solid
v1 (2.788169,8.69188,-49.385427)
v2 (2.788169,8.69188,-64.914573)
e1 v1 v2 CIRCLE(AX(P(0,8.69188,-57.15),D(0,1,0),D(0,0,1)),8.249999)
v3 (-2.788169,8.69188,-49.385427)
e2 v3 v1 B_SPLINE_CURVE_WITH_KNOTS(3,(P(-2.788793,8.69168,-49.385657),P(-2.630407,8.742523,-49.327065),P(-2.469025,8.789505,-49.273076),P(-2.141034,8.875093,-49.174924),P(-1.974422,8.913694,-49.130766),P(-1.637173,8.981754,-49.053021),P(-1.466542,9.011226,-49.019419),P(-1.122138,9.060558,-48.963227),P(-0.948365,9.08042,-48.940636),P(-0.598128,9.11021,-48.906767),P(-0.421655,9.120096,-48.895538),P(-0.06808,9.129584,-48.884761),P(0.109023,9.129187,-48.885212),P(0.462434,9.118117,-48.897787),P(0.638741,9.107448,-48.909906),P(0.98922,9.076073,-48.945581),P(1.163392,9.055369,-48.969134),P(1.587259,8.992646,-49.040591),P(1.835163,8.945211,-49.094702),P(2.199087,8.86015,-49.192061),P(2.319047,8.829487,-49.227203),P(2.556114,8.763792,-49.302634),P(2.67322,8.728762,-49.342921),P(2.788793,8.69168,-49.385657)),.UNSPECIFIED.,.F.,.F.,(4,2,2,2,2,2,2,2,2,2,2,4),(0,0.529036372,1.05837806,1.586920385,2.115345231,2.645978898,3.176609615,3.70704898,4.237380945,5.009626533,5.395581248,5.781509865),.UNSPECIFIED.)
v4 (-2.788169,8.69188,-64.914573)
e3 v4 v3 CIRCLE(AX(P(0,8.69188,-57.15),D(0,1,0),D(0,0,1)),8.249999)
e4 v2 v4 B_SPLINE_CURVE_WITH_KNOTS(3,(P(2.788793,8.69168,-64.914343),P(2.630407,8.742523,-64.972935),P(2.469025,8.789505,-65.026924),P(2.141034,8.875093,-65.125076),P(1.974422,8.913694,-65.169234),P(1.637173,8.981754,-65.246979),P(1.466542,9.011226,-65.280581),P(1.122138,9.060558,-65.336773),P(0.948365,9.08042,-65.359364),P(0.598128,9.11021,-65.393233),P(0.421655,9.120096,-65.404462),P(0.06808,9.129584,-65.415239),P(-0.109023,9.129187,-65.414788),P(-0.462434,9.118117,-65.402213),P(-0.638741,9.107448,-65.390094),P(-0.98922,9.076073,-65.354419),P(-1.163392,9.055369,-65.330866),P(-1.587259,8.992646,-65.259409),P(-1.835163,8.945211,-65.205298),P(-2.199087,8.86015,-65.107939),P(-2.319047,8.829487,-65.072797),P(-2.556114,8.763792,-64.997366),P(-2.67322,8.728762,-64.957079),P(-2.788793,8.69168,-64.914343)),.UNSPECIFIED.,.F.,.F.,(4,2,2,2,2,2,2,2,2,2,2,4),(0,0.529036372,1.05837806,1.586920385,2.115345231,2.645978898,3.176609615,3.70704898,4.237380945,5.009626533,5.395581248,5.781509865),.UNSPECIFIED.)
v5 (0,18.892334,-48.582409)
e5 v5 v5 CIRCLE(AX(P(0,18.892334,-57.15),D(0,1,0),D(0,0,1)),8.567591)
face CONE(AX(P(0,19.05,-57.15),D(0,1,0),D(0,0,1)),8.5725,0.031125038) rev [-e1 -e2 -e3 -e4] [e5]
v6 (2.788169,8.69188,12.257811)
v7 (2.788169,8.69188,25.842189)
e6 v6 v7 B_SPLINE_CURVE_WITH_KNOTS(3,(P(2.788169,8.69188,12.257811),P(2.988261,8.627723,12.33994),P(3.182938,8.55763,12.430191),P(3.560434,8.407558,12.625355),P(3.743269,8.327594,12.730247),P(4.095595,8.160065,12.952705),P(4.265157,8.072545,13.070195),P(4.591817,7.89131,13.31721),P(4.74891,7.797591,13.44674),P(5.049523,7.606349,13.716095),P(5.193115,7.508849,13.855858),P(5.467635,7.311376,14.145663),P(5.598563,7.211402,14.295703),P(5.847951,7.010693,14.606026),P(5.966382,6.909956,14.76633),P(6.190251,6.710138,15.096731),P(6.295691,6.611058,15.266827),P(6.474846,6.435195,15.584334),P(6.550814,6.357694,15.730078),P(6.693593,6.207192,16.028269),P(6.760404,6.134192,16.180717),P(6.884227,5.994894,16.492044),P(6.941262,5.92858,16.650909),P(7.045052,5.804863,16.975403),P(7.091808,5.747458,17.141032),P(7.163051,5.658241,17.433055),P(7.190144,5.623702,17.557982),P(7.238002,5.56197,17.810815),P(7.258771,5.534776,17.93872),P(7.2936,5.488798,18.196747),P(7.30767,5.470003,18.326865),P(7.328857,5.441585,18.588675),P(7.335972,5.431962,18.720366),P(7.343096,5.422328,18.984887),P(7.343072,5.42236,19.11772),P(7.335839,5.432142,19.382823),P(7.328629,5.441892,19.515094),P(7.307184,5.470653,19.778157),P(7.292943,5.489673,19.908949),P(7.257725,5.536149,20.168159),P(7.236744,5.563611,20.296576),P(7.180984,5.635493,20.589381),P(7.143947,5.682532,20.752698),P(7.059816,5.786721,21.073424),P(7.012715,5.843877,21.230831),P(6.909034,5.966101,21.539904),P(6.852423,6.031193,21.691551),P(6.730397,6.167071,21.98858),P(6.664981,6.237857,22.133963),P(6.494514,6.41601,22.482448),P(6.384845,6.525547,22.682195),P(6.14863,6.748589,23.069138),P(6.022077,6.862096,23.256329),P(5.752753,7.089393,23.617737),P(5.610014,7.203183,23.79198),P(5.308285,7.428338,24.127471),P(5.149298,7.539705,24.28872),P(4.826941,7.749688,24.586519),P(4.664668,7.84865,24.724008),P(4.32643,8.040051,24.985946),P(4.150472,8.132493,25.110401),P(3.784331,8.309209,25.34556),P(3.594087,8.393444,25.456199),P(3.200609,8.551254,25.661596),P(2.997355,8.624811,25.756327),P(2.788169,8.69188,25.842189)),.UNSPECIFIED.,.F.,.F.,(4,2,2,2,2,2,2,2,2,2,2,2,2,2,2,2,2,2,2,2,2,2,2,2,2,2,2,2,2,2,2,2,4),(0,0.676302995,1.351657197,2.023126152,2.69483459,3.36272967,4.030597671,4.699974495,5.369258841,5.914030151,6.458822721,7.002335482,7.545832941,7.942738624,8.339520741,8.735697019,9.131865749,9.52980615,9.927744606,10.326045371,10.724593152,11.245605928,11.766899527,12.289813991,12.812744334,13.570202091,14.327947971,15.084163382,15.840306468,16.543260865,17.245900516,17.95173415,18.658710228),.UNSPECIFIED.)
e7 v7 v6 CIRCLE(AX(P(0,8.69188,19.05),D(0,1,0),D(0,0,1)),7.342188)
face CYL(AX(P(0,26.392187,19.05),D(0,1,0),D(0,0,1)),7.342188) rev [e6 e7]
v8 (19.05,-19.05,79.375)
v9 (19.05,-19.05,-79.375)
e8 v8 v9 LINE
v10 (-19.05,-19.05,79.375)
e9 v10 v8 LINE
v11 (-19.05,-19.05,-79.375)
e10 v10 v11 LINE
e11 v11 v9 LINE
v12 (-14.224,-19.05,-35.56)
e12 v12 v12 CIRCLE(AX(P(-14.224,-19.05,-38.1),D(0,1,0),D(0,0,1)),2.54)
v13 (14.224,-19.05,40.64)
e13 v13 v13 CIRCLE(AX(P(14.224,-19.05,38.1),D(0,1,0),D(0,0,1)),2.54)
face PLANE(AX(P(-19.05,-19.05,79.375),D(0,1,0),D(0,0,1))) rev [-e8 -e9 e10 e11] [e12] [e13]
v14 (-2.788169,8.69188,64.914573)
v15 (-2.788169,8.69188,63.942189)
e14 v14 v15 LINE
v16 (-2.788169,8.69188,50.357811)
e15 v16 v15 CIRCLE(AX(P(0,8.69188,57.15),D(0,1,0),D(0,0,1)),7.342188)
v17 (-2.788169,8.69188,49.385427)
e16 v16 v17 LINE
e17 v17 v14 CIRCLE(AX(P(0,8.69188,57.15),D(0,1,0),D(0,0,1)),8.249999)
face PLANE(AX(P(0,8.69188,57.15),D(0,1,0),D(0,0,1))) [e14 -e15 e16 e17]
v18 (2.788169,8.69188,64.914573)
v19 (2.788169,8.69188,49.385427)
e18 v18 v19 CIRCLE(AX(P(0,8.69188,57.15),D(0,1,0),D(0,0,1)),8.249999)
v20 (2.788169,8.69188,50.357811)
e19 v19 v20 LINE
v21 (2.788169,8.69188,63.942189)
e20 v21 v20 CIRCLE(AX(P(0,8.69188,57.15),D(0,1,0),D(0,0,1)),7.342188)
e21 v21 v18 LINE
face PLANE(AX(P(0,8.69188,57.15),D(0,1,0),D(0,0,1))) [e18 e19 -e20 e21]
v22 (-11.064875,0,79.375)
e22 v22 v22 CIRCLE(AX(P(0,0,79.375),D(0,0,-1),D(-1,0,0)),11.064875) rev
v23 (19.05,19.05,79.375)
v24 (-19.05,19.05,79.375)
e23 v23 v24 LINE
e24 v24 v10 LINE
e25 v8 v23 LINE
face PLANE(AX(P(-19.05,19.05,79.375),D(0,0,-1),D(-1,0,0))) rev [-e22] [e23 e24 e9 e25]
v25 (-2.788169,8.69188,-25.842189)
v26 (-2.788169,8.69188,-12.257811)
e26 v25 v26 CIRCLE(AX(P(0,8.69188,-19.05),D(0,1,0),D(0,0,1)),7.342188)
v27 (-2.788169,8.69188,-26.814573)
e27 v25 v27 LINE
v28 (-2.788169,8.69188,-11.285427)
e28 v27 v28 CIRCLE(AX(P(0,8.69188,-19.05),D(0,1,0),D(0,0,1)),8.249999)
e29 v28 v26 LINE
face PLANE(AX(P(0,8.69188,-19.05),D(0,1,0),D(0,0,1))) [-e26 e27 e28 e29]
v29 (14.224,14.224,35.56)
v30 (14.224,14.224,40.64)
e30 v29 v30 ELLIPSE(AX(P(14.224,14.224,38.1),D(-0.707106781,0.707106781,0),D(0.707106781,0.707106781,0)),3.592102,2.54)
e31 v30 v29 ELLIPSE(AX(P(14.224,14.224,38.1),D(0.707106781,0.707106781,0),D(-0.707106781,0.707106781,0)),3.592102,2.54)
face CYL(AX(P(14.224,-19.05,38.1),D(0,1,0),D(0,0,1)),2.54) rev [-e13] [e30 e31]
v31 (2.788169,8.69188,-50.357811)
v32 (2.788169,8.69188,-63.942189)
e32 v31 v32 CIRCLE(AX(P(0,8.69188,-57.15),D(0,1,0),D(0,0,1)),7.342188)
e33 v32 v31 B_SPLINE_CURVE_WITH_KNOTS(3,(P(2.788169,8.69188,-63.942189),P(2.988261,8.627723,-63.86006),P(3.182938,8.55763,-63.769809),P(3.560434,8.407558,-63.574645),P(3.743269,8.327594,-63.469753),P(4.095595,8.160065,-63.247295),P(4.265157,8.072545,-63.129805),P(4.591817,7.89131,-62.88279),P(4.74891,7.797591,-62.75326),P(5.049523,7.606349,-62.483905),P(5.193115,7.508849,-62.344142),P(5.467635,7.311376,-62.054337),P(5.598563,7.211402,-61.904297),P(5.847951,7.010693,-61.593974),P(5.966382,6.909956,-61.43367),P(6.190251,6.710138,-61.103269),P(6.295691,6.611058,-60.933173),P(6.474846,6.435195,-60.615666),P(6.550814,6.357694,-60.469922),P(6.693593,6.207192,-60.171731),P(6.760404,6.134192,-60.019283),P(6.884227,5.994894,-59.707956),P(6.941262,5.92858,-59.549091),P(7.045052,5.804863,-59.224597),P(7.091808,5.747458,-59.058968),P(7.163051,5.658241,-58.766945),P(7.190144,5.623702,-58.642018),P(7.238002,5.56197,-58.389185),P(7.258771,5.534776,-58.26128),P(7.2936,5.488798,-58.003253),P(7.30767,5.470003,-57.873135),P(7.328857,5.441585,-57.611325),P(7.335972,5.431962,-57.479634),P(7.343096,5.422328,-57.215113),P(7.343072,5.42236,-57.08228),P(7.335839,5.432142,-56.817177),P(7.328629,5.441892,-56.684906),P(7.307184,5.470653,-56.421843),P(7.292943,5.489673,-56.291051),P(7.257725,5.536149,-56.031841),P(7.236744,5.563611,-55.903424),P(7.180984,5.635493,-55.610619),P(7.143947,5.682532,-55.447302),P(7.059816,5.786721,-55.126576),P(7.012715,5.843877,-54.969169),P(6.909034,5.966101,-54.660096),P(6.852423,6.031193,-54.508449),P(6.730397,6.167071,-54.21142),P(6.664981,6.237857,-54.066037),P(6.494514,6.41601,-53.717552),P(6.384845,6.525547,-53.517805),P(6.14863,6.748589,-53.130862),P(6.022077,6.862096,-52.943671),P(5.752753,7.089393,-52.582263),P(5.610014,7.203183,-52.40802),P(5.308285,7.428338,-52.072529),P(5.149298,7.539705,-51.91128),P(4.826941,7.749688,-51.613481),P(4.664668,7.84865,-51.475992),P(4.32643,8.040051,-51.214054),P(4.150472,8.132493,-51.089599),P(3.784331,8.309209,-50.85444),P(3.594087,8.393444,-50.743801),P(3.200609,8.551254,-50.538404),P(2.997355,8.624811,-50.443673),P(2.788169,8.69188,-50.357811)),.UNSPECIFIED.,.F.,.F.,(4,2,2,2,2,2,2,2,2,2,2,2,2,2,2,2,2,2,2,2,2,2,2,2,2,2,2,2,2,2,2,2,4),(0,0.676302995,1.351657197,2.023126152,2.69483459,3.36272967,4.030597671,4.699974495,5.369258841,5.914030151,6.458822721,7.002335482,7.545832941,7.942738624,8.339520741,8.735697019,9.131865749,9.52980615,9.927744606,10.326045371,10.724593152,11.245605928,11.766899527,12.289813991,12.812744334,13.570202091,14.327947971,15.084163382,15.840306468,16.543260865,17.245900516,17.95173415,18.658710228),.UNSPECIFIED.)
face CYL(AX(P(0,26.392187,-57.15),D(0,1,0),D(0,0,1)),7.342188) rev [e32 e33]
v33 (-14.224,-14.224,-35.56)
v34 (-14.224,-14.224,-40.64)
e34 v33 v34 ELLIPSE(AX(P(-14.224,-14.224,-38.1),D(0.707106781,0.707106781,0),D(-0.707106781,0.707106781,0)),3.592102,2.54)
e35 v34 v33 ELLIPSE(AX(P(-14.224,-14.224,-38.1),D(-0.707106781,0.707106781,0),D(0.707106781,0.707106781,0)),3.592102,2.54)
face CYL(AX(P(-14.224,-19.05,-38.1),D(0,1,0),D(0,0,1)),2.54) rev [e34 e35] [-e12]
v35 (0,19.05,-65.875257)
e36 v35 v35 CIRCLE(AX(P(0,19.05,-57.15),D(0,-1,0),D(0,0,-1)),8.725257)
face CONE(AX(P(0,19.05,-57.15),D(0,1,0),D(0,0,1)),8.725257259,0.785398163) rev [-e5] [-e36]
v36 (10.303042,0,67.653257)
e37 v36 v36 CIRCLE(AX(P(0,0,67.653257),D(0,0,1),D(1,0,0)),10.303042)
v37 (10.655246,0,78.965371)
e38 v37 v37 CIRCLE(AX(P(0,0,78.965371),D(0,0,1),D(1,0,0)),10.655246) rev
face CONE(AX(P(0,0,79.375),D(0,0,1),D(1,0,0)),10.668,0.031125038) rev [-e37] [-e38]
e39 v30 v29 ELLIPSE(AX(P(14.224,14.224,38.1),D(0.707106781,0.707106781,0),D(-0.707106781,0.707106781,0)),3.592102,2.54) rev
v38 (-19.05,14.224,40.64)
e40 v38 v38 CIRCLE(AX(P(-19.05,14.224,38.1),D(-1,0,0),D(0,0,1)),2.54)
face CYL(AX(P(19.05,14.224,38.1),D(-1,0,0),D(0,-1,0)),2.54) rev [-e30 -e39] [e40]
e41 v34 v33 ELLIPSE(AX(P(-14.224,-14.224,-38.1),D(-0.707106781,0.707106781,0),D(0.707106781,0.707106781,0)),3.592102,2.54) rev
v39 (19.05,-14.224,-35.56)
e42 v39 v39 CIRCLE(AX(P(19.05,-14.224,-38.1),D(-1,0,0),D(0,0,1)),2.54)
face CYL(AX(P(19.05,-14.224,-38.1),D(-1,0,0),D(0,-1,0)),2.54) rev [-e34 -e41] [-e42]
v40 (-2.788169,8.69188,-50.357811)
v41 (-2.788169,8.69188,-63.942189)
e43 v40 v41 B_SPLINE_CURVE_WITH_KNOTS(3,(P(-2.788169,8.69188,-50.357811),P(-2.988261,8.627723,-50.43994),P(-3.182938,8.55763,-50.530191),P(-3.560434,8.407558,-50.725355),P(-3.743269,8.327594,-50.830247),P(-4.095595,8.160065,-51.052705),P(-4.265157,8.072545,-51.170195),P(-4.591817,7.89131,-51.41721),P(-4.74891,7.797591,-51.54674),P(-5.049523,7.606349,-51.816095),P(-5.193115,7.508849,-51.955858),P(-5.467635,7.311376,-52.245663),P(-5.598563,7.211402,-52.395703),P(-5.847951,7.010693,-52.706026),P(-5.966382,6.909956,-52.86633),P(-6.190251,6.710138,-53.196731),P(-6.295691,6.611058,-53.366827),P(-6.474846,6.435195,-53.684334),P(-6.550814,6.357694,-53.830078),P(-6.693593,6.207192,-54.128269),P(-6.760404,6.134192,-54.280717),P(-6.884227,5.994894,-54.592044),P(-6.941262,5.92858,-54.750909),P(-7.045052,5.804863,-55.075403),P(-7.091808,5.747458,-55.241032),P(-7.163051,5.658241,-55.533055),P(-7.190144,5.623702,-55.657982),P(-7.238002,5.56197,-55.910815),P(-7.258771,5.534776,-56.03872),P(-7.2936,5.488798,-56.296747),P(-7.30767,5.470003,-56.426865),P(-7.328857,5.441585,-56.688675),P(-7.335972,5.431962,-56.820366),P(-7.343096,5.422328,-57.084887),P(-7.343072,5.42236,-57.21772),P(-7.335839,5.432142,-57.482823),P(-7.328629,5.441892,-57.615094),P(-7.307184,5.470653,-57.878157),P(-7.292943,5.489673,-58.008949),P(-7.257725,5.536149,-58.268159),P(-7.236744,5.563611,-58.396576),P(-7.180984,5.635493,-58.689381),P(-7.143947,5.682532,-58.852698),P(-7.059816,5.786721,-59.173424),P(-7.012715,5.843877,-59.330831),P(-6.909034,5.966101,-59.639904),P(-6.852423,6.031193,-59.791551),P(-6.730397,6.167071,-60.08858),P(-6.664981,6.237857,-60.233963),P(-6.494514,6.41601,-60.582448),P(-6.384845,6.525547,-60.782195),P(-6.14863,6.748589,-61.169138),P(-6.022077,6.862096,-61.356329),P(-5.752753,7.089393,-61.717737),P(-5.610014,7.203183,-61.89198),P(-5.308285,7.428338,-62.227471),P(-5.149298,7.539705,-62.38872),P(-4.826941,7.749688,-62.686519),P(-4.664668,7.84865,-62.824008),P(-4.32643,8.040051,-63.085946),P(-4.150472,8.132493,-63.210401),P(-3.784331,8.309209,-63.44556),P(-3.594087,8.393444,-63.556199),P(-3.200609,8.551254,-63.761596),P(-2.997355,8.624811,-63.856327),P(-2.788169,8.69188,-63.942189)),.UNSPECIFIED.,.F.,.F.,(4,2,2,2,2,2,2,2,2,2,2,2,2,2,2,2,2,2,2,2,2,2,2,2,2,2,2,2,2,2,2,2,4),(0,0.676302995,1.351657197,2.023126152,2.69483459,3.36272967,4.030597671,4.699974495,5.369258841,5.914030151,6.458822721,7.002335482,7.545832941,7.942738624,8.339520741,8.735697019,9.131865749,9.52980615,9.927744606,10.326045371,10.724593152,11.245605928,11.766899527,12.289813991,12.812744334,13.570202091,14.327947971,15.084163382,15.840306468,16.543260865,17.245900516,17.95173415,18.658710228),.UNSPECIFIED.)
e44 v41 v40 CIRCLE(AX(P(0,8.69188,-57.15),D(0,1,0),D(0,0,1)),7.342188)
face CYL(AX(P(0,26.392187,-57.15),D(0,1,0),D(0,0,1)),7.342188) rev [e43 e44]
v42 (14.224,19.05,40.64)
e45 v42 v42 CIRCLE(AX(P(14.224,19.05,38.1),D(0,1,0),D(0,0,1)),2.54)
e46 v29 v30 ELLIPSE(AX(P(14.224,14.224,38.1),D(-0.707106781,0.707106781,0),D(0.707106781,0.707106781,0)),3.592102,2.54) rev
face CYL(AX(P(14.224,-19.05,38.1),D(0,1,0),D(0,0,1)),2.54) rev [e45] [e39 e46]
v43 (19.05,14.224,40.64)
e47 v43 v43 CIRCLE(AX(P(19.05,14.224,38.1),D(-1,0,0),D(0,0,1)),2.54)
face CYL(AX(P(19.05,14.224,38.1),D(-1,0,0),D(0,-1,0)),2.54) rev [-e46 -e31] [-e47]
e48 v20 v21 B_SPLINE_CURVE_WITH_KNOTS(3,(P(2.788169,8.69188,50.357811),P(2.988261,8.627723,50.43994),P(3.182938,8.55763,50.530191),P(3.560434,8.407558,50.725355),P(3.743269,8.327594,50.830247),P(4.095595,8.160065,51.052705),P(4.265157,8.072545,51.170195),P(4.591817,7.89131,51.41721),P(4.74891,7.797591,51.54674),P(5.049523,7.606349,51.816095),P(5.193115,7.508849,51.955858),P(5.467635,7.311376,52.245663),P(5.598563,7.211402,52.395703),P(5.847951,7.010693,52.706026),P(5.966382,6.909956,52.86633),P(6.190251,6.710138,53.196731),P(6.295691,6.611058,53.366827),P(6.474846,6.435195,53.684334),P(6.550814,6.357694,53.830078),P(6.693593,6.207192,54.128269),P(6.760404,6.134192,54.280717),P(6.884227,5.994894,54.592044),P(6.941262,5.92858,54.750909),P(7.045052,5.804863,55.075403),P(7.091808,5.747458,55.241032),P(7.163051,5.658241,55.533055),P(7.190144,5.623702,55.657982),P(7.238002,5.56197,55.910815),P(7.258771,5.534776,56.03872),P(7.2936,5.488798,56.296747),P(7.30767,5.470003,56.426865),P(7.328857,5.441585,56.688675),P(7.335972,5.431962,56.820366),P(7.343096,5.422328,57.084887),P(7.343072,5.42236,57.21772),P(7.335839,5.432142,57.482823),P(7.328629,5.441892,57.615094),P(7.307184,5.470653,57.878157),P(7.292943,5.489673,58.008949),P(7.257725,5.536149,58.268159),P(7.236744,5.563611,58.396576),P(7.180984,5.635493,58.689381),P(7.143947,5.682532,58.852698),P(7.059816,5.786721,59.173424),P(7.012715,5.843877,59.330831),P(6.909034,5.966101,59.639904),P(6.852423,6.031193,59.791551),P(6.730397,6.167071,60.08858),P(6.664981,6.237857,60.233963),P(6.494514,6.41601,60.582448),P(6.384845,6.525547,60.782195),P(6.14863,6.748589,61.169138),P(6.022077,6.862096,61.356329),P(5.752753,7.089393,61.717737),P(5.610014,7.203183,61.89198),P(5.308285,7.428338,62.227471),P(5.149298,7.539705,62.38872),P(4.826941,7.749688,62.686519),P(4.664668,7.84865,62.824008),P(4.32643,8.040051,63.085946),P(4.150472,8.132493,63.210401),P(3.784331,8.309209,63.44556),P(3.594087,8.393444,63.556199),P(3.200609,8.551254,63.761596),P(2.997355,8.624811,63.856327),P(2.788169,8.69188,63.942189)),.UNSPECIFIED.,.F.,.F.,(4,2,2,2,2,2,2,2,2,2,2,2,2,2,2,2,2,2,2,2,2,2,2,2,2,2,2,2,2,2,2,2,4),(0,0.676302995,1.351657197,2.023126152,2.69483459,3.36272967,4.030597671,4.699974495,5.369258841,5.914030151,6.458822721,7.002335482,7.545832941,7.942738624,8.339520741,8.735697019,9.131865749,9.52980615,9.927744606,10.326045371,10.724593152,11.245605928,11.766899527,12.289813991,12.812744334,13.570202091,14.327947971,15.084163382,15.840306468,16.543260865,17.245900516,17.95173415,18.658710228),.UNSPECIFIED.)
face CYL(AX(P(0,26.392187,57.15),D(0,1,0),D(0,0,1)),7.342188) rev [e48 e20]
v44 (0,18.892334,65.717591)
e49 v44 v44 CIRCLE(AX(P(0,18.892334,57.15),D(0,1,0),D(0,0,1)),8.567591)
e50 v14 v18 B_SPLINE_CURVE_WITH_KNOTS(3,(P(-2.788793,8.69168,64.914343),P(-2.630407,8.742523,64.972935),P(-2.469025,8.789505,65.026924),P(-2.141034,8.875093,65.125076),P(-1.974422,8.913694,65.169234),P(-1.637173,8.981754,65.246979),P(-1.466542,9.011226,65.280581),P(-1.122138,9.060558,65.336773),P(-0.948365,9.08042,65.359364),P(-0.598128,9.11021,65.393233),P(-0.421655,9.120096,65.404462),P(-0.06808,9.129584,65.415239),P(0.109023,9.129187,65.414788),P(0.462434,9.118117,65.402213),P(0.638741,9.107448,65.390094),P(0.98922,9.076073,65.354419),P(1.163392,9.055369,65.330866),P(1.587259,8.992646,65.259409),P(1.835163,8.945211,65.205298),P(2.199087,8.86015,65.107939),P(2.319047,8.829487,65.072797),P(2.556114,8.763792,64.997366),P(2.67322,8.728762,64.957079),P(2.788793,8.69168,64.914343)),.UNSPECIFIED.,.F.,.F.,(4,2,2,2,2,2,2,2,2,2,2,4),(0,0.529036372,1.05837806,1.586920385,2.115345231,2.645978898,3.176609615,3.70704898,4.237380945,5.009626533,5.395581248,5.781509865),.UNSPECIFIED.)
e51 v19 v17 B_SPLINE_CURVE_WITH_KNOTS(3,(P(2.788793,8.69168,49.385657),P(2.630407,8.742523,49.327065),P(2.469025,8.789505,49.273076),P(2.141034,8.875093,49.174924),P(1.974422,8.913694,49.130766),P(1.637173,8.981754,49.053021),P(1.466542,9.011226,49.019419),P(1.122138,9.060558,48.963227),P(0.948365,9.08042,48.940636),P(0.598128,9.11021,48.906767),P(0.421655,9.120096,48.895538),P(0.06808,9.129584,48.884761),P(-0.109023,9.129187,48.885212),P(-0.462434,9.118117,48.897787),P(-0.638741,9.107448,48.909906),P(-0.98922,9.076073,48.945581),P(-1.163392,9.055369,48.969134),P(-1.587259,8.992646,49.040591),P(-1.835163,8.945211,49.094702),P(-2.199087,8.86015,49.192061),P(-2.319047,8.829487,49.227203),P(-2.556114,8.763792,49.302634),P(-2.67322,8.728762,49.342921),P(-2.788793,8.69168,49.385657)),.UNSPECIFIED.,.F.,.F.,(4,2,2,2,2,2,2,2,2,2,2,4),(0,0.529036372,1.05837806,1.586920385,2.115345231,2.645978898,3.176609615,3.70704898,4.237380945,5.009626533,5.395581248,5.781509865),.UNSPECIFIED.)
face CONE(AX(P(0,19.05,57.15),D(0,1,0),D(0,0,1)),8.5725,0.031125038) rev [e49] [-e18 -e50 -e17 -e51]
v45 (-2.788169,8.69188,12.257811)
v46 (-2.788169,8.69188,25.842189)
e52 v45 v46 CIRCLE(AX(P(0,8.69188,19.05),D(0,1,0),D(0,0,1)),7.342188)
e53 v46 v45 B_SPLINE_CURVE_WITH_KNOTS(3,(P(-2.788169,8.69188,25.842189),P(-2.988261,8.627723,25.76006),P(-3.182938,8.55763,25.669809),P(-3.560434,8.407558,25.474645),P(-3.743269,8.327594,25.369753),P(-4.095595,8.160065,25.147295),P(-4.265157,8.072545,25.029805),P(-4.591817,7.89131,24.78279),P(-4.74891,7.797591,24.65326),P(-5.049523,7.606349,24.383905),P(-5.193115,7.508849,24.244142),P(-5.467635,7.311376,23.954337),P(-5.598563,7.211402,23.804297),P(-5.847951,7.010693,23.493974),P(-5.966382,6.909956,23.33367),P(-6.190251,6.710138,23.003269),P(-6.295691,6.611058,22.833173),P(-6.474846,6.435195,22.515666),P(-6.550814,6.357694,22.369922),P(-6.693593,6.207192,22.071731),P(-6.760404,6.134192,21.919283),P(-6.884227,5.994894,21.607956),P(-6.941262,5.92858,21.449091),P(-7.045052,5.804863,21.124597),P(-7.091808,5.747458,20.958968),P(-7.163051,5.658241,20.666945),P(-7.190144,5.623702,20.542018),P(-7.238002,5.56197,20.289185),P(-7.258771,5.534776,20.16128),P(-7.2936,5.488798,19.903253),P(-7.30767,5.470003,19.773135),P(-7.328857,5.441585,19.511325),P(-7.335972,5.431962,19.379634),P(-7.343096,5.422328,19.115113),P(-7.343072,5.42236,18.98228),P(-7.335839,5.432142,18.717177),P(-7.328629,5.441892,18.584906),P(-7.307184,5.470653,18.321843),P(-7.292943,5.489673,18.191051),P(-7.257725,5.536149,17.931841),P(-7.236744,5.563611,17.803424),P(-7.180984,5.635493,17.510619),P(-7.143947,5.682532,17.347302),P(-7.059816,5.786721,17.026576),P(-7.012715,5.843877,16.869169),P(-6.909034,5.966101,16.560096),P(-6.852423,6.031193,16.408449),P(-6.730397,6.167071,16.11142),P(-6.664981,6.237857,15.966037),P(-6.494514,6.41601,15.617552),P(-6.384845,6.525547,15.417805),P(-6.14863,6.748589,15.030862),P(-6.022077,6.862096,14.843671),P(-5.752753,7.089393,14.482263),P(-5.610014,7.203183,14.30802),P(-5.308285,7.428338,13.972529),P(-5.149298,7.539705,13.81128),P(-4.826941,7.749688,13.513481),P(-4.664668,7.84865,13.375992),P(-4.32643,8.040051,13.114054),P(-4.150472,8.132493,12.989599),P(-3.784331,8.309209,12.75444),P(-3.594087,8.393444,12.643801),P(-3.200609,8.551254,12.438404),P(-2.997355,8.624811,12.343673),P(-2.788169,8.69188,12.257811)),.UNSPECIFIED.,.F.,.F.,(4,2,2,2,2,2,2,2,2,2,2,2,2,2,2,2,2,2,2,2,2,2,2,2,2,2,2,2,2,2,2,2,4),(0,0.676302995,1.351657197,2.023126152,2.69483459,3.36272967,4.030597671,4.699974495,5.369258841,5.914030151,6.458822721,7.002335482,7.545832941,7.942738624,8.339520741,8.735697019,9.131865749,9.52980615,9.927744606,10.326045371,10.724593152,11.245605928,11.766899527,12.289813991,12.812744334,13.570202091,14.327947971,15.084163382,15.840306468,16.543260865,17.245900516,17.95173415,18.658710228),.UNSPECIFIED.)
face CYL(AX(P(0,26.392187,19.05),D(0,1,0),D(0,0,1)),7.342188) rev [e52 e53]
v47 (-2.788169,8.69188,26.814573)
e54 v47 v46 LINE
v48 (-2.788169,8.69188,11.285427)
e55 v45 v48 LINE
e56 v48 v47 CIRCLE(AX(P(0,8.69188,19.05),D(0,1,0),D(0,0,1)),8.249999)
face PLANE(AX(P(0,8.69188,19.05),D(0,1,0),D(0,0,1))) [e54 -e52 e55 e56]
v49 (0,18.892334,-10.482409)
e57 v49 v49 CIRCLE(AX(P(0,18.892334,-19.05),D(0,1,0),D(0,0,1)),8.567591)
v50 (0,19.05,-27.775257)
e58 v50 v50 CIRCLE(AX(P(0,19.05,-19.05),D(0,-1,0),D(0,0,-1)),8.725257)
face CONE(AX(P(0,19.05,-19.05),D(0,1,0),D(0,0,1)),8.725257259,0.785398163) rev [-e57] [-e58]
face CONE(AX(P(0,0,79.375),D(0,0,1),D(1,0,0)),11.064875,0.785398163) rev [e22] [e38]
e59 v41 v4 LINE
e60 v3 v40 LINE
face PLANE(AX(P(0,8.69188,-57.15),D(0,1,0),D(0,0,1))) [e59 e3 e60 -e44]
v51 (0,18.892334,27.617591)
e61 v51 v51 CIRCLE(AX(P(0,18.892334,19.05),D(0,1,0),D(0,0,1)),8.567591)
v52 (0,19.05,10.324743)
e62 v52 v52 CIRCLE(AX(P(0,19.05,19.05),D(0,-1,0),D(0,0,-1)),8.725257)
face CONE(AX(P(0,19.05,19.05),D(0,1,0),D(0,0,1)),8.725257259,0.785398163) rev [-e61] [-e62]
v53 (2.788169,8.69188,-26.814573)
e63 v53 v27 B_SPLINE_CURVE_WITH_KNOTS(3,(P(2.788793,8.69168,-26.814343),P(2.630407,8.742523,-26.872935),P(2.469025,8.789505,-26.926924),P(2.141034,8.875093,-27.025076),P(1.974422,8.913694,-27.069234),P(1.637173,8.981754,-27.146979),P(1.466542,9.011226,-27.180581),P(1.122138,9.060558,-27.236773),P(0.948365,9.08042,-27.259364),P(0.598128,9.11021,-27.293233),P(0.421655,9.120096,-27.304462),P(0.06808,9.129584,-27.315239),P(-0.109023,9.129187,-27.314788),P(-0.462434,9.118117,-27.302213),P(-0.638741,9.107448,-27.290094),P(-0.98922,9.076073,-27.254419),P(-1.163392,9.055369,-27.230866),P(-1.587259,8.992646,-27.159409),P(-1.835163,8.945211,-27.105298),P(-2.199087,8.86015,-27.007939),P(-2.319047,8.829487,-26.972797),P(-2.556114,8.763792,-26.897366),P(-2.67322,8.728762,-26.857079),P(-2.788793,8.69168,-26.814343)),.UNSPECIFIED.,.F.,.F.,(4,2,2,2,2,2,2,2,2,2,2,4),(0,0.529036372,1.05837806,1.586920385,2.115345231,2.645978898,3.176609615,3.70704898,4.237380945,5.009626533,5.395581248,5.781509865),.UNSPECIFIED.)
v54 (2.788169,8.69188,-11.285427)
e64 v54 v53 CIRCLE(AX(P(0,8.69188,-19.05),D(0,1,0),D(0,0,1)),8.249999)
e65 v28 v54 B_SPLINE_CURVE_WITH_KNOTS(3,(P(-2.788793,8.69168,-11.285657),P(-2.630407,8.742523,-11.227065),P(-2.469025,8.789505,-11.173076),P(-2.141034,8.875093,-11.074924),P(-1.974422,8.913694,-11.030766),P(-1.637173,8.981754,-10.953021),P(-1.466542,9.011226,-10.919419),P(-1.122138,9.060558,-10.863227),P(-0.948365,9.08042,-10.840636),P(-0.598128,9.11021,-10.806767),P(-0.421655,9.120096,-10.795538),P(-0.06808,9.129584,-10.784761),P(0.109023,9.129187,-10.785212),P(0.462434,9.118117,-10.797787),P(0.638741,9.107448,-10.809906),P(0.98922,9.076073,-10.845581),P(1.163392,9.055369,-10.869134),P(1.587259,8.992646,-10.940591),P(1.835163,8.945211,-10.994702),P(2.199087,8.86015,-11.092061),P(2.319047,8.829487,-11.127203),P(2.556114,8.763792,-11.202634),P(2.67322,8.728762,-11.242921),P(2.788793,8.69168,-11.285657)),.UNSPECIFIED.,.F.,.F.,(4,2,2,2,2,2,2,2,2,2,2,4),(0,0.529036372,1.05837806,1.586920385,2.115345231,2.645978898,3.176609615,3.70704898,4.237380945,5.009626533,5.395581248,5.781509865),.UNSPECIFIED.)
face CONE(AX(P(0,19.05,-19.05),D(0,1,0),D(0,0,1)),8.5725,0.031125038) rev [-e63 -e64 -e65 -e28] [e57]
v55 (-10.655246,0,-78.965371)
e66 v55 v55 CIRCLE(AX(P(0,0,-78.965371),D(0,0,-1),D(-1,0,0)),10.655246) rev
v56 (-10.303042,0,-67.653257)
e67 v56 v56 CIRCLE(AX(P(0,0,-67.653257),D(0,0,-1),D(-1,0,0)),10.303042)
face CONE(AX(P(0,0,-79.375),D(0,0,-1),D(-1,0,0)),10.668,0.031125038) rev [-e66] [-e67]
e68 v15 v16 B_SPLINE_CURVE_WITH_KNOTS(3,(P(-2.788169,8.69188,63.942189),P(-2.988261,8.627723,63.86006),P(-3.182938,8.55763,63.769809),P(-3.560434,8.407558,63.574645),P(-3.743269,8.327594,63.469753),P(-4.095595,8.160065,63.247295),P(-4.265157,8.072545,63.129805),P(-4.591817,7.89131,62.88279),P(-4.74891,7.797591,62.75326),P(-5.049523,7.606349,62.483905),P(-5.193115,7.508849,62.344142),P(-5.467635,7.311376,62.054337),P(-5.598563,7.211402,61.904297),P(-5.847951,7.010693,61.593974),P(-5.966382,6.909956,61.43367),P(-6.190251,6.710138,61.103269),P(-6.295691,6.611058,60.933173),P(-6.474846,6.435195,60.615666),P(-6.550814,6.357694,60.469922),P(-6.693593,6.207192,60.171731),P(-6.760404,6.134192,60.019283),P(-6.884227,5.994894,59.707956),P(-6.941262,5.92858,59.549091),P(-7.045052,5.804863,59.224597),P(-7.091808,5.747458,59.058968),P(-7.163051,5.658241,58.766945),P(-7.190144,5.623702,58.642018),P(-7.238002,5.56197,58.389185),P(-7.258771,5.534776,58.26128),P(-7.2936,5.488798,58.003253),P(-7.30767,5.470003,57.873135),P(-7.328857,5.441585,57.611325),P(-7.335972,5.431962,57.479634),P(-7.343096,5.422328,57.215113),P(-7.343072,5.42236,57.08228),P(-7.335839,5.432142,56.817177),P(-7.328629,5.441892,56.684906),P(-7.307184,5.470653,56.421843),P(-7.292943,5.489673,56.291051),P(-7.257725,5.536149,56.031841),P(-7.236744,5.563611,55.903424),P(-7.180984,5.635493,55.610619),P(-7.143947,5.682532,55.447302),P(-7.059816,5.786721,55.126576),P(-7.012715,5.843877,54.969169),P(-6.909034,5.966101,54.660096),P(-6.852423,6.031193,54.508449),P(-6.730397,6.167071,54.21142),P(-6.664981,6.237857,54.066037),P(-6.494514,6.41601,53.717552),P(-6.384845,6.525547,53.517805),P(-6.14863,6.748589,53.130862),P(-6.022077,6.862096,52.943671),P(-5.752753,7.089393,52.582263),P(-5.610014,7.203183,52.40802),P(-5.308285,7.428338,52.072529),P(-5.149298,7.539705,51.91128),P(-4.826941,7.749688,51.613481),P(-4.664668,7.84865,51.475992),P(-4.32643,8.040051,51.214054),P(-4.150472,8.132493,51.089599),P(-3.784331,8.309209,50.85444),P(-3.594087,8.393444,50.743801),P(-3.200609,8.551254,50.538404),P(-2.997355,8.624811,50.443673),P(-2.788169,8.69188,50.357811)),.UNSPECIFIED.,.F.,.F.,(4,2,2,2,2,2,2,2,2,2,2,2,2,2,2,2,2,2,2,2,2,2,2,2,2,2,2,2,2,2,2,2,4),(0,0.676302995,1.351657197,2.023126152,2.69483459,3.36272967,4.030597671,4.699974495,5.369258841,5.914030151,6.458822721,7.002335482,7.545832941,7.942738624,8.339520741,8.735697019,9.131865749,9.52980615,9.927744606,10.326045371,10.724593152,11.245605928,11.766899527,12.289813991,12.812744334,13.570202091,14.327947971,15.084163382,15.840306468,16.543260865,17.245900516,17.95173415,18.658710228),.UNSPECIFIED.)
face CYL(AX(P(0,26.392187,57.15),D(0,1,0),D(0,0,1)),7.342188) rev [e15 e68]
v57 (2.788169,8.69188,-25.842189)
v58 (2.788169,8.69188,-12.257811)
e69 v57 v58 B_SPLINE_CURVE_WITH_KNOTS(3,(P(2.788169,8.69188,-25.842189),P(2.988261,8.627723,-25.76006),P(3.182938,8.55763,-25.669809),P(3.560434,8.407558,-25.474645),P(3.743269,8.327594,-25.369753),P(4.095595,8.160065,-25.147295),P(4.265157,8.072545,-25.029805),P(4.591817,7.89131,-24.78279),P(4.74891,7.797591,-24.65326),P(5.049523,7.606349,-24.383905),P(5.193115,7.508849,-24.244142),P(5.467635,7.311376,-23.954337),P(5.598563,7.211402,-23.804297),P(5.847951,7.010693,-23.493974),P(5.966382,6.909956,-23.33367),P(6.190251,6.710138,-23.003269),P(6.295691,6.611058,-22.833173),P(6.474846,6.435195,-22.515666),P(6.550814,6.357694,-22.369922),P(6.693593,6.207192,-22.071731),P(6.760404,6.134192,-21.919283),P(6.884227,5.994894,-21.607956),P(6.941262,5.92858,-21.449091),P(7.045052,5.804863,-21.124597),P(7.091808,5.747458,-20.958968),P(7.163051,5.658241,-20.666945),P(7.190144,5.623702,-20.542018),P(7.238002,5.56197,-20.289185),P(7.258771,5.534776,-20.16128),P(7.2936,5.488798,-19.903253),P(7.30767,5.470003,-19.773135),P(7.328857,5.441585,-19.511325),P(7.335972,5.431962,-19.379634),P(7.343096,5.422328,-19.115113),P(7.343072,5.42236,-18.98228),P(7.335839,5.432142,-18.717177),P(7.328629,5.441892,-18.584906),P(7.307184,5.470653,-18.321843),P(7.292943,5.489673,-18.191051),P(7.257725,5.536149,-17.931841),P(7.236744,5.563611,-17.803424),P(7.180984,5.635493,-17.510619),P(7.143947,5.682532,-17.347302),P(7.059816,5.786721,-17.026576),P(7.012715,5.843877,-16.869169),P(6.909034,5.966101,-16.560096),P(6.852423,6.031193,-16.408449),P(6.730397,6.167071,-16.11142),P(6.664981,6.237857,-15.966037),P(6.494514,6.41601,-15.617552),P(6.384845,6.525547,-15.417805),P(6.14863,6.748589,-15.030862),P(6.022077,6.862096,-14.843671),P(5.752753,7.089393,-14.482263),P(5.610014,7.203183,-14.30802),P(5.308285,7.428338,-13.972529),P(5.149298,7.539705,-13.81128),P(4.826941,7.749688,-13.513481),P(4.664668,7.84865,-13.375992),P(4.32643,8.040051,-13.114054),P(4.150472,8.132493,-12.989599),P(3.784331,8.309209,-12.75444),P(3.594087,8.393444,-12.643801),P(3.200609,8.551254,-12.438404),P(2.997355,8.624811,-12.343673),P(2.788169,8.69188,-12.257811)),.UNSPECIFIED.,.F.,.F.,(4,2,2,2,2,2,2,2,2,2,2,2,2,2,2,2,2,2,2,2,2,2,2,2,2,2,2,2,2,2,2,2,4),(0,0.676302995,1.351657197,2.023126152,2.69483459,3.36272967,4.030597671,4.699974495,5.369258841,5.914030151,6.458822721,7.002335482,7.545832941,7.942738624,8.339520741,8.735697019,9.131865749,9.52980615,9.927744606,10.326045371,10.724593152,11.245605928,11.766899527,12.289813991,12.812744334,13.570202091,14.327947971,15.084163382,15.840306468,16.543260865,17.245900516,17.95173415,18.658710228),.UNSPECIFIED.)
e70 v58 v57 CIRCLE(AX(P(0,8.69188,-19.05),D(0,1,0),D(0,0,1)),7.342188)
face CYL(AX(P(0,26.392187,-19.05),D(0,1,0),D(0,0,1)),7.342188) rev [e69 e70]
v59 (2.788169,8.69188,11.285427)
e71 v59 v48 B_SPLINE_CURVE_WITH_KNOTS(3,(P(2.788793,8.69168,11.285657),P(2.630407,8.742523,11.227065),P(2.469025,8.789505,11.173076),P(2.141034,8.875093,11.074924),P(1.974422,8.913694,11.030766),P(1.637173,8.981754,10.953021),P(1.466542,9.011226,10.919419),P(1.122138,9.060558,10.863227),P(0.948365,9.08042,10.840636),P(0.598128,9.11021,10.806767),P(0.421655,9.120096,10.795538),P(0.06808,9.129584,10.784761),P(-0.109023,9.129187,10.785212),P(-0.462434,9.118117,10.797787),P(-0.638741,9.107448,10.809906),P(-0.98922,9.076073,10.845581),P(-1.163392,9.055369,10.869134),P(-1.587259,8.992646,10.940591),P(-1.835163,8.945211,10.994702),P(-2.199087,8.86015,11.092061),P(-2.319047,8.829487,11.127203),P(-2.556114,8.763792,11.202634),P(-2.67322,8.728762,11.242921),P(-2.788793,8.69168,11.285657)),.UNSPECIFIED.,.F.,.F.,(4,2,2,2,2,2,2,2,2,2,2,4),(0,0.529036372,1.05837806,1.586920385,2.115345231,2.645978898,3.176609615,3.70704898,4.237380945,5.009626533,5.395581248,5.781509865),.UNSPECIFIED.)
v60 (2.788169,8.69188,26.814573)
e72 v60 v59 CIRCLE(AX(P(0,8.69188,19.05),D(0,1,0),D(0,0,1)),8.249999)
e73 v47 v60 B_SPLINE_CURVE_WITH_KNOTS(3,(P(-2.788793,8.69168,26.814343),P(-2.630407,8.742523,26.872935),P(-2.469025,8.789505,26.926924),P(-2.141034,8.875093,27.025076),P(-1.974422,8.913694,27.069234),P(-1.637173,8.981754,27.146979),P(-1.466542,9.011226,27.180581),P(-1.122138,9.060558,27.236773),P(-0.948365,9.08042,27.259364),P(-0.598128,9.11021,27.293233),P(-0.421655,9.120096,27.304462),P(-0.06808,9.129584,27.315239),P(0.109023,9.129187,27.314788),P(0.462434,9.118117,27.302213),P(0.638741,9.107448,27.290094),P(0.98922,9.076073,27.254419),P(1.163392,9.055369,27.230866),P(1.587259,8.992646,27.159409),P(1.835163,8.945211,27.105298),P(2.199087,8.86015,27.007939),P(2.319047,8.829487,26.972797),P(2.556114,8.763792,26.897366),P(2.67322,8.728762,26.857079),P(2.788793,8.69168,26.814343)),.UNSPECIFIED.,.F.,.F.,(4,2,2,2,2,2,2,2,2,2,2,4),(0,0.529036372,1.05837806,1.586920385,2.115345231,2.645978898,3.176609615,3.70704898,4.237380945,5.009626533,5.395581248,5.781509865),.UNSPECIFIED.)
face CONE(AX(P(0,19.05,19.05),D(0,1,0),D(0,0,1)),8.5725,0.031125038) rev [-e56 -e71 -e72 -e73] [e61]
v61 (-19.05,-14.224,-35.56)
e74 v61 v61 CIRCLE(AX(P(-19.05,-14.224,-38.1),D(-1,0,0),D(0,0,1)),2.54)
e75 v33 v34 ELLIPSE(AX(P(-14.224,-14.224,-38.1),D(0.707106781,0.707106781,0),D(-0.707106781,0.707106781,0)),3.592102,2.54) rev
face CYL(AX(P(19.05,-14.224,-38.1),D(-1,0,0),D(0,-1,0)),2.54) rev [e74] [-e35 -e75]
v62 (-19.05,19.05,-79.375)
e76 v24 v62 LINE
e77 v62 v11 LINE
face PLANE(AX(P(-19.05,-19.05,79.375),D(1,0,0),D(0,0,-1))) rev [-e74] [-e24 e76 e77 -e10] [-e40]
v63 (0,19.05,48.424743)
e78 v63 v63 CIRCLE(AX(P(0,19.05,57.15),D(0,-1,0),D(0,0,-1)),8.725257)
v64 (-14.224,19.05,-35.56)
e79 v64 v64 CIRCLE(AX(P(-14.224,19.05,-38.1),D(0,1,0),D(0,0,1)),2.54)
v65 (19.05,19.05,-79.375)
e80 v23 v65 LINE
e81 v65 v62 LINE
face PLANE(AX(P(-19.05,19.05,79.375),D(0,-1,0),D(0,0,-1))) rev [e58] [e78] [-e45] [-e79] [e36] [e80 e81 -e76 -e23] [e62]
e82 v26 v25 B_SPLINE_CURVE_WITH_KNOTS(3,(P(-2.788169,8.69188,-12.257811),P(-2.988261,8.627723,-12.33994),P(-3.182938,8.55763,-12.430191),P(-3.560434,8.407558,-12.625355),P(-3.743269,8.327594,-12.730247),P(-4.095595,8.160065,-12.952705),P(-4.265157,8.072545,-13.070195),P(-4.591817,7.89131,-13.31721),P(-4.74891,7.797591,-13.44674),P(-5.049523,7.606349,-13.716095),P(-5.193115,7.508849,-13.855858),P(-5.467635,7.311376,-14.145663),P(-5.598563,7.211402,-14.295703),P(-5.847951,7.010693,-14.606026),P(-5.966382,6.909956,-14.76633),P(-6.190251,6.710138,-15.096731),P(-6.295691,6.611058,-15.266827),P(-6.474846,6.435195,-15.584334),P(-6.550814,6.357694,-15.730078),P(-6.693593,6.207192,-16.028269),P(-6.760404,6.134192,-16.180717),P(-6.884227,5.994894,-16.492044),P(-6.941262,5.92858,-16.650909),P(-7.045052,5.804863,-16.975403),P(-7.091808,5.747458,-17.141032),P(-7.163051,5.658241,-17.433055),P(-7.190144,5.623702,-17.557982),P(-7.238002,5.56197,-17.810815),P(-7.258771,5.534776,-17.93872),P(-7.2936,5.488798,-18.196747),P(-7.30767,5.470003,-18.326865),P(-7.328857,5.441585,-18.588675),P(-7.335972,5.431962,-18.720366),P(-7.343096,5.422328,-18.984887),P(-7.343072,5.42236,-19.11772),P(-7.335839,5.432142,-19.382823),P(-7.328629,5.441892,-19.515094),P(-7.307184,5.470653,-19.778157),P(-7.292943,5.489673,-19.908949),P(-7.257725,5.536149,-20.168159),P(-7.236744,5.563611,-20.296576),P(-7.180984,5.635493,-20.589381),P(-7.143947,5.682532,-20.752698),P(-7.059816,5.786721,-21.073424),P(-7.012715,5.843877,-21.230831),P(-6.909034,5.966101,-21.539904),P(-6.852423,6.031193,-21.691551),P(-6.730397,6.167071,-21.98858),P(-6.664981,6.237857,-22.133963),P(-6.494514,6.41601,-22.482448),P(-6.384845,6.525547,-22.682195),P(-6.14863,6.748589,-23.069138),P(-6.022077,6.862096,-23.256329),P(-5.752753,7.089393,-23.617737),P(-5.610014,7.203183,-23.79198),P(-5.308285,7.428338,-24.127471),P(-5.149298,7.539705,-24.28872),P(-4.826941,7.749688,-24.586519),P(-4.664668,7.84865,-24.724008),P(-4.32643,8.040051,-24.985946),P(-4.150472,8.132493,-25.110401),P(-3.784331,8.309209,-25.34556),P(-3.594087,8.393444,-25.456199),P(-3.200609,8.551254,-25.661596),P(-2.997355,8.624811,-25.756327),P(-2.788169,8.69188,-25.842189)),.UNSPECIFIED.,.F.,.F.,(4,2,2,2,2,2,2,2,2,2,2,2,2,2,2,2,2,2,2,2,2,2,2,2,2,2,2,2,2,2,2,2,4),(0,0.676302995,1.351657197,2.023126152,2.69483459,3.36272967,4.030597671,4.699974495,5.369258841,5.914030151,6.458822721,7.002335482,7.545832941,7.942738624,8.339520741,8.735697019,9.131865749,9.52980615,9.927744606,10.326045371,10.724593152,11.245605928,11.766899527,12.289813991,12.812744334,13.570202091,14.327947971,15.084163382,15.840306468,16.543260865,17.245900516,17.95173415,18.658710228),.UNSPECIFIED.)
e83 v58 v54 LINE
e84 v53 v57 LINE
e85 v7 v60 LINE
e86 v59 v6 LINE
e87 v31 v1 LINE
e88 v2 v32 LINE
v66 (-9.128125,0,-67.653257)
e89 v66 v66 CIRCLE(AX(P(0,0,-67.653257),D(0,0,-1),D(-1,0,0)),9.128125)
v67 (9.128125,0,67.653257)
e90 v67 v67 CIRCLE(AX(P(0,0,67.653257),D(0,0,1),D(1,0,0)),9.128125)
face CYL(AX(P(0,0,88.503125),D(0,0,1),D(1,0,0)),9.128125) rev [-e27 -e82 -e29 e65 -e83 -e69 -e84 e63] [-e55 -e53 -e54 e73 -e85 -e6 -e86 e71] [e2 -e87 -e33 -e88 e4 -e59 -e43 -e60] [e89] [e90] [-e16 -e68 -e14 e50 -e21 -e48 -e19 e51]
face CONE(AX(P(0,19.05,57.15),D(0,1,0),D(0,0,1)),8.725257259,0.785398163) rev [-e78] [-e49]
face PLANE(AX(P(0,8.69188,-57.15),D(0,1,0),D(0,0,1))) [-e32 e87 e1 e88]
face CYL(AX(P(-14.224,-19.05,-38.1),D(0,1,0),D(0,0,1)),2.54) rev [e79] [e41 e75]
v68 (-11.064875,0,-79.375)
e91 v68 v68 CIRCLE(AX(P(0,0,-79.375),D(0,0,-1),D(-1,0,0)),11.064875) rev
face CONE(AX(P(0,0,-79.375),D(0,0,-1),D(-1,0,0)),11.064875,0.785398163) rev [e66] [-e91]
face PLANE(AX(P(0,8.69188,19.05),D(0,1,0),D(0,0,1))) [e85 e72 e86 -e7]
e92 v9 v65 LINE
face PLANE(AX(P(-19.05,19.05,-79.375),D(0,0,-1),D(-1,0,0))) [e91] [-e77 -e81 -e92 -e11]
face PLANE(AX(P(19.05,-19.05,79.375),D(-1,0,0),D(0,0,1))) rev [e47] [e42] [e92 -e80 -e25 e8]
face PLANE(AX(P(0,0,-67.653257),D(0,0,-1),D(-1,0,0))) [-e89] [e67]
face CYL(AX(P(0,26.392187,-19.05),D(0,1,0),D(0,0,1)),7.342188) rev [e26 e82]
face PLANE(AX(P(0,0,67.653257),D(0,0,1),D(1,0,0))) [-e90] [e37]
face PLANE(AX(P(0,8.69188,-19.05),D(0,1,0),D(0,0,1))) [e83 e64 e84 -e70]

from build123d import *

# Parameters (mm, degrees)
SKETCH1_W                    = 38.1
SKETCH1_H                    = 38.1
BOSS_EXTRUDE1_DEPTH          = 79.375
SKETCH3_R                    = 8.5725
CUT_EXTRUDE1_DEPTH           = 10.35812
CUT_EXTRUDE1_DRAFT           = -1.783333333
LPATTERN1_COUNT              = 4
LPATTERN1_PITCH              = 38.1
LPATTERN1_COPY_1_SKETCH_R    = 8.5725
LPATTERN1_COPY_1_DEPTH       = 10.35812
LPATTERN1_COPY_1_DRAFT       = -1.783333333
LPATTERN1_COPY_2_SKETCH_R    = 8.5725
LPATTERN1_COPY_2_DEPTH       = 10.35812
LPATTERN1_COPY_2_DRAFT       = -1.783333333
LPATTERN1_COPY_3_SKETCH_R    = 8.5725
LPATTERN1_COPY_3_DEPTH       = 10.35812
LPATTERN1_COPY_3_DRAFT       = -1.783333333
SKETCH8_R                    = 10.668
CUT_EXTRUDE3_DEPTH           = 11.721742741
CUT_EXTRUDE3_DRAFT           = -1.783333333
SKETCH13_R                   = 11.064875
CUT_EXTRUDE6_DEPTH           = 2.54
CUT_EXTRUDE6_TAPER           = 45
CUT_EXTRUDE6_OTHER_WAY_DEPTH = 10.16
CUT_EXTRUDE6_OTHER_WAY_TAPER = 45
CIRPATTERN2_COUNT            = 2
CIRPATTERN2_COPY_1_SKETCH_R  = 10.668
CIRPATTERN2_COPY_1_DEPTH     = 11.721742741
CIRPATTERN2_COPY_1_DRAFT     = -1.783333333
SKETCH12_R                   = 2.54
CUT_EXTRUDE5_DEPTH           = 91.082757178
CIRPATTERN3_COUNT            = 2
CIRPATTERN3_ANGLE            = 90


# Read off the part's stored shape, not the designer's step: Cut-Extrude2
with BuildPart() as part:
    # Sketch1 → Boss-Extrude1 (new, symmetric)
    with BuildSketch(Plane.XY):
        Rectangle(SKETCH1_W, SKETCH1_H)
    extrude(amount=BOSS_EXTRUDE1_DEPTH, both=True)

    # Sketch2 → Cut-Revolve1 (revolve, cut)
    with BuildSketch(Plane(origin=(0, 0, 0), x_dir=(0, 0, -1), z_dir=(1, 0, 0)), mode=Mode.PRIVATE) as cut_revolve1_sk:
        Polygon((57.15, 19.05), (57.15, -4.411631326), (64.4921875, 0), (64.4921875, 19.05), align=None)
    cut_revolve1 = revolve(cut_revolve1_sk.sketch.rotate(Axis((0, 26.3921875, -57.15), (0, -1, 0)), 180), axis=Axis((0, 26.3921875, -57.15), (0, -1, 0)), mode=Mode.SUBTRACT)


with BuildPart() as cut_extrude1_tool:
    # Sketch3 → Cut-Extrude1 (with draft: the straight prism first)
    with BuildSketch(Plane(origin=(0, 19.05, 0), x_dir=(1, 0, 0), z_dir=(0, 1, 0))):
        with Locations((0, 57.15)):
            Circle(SKETCH3_R)
    extrude(amount=-CUT_EXTRUDE1_DEPTH)
    # Cut-Extrude1: the draft: its side faces are tilted about the plane it starts from
    cut_extrude1_sides = [cut_extrude1_tool.faces().sort_by_distance(p)[0] for p in [
        (-8.5725, 13.87094, -57.15),
    ]]
    draft(cut_extrude1_sides, Plane(origin=(0, 19.05, 0), x_dir=(1, 0, 0), z_dir=(0, 1, 0)), CUT_EXTRUDE1_DRAFT)


with BuildPart() as part_1:
    add(part.part)

    # Cut-Extrude1: cut by cut_extrude1_tool
    add(cut_extrude1_tool.part, mode=Mode.SUBTRACT)

    # Cut-Extrude2 outline → Cut-Extrude2 (revolve, cut)
    with BuildSketch(Plane.XY.offset(-57.15)):
        Polygon((8.567591048, 19.05), (8.567591048, 18.892333789), (8.725257259, 19.05), align=None)
    cut_extrude2 = revolve(axis=Axis((0, 0, -57.15), (0, 1, 0)), mode=Mode.SUBTRACT)

    # LPattern1: Cut-Revolve1, Cut-Extrude2 ×4
    with Locations(*[(0, 0, i * LPATTERN1_PITCH) for i in range(1, LPATTERN1_COUNT)]):
        add(cut_revolve1, mode=Mode.SUBTRACT)
        add(cut_extrude2, mode=Mode.SUBTRACT)


with BuildPart() as lpattern1_copy_1_tool:
    # LPattern1 copy 1 sketch → LPattern1 copy 1 (with draft: the straight prism first)
    with BuildSketch(Plane(origin=(0, 19.05, 38.1), x_dir=(1, 0, 0), z_dir=(0, 1, 0))):
        with Locations((0, 57.15)):
            Circle(LPATTERN1_COPY_1_SKETCH_R)
    extrude(amount=-LPATTERN1_COPY_1_DEPTH)
    # LPattern1 copy 1: the draft: its side faces are tilted about the plane it starts from
    lpattern1_copy_1_sides = [lpattern1_copy_1_tool.faces().sort_by_distance(p)[0] for p in [
        (-8.5725, 13.87094, -19.05),
    ]]
    draft(lpattern1_copy_1_sides, Plane(origin=(0, 19.05, 38.1), x_dir=(1, 0, 0), z_dir=(0, 1, 0)), LPATTERN1_COPY_1_DRAFT)


with BuildPart() as part_2:
    add(part_1.part)

    # LPattern1 copy 1: cut by lpattern1_copy_1_tool
    add(lpattern1_copy_1_tool.part, mode=Mode.SUBTRACT)


with BuildPart() as lpattern1_copy_2_tool:
    # LPattern1 copy 2 sketch → LPattern1 copy 2 (with draft: the straight prism first)
    with BuildSketch(Plane(origin=(0, 19.05, 76.2), x_dir=(1, 0, 0), z_dir=(0, 1, 0))):
        with Locations((0, 57.15)):
            Circle(LPATTERN1_COPY_2_SKETCH_R)
    extrude(amount=-LPATTERN1_COPY_2_DEPTH)
    # LPattern1 copy 2: the draft: its side faces are tilted about the plane it starts from
    lpattern1_copy_2_sides = [lpattern1_copy_2_tool.faces().sort_by_distance(p)[0] for p in [
        (-8.5725, 13.87094, 19.05),
    ]]
    draft(lpattern1_copy_2_sides, Plane(origin=(0, 19.05, 76.2), x_dir=(1, 0, 0), z_dir=(0, 1, 0)), LPATTERN1_COPY_2_DRAFT)


with BuildPart() as part_3:
    add(part_2.part)

    # LPattern1 copy 2: cut by lpattern1_copy_2_tool
    add(lpattern1_copy_2_tool.part, mode=Mode.SUBTRACT)


with BuildPart() as lpattern1_copy_3_tool:
    # LPattern1 copy 3 sketch → LPattern1 copy 3 (with draft: the straight prism first)
    with BuildSketch(Plane(origin=(0, 19.05, 114.3), x_dir=(1, 0, 0), z_dir=(0, 1, 0))):
        with Locations((0, 57.15)):
            Circle(LPATTERN1_COPY_3_SKETCH_R)
    extrude(amount=-LPATTERN1_COPY_3_DEPTH)
    # LPattern1 copy 3: the draft: its side faces are tilted about the plane it starts from
    lpattern1_copy_3_sides = [lpattern1_copy_3_tool.faces().sort_by_distance(p)[0] for p in [
        (-8.5725, 13.87094, 57.15),
    ]]
    draft(lpattern1_copy_3_sides, Plane(origin=(0, 19.05, 114.3), x_dir=(1, 0, 0), z_dir=(0, 1, 0)), LPATTERN1_COPY_3_DRAFT)


with BuildPart() as part_4:
    add(part_3.part)

    # LPattern1 copy 3: cut by lpattern1_copy_3_tool
    add(lpattern1_copy_3_tool.part, mode=Mode.SUBTRACT)

    # Sketch7 → Cut-Revolve2 (revolve, cut)
    with BuildSketch(Plane(origin=(0, 0, 0), x_dir=(0, 0, -1), z_dir=(1, 0, 0)), mode=Mode.PRIVATE) as cut_revolve2_sk:
        Polygon((-79.375, 0), (5.484730838, 0), (0, 9.128125), (-79.375, 9.128125), align=None)
    cut_revolve2 = revolve(cut_revolve2_sk.sketch.rotate(Axis((0, 0, 88.503125), (0, 0, -1)), 90), axis=Axis((0, 0, 88.503125), (0, 0, -1)), mode=Mode.SUBTRACT)


with BuildPart() as cut_extrude3_tool:
    # Sketch8 → Cut-Extrude3 (with draft: the straight prism first)
    with BuildSketch(Plane.XY.offset(79.375)):
        Circle(SKETCH8_R)
    extrude(amount=-CUT_EXTRUDE3_DEPTH)
    # Cut-Extrude3: the draft: its side faces are tilted about the plane it starts from
    cut_extrude3_sides = [cut_extrude3_tool.faces().sort_by_distance(p)[0] for p in [
        (-10.668, 0, 73.514128629),
    ]]
    draft(cut_extrude3_sides, Plane.XY.offset(79.375), CUT_EXTRUDE3_DRAFT)


with BuildPart() as part_5:
    add(part_4.part)

    # Cut-Extrude3: cut by cut_extrude3_tool
    add(cut_extrude3_tool.part, mode=Mode.SUBTRACT)

    # Sketch13 → Cut-Extrude6 (cut)
    with BuildSketch(Plane.XY.offset(79.375)):
        Circle(SKETCH13_R)
    cut_extrude6 = extrude(amount=-CUT_EXTRUDE6_DEPTH, taper=CUT_EXTRUDE6_TAPER, mode=Mode.SUBTRACT)

    # Sketch13 → Cut-Extrude6 other way (cut)
    with BuildSketch(Plane.XY.offset(79.375)):
        Circle(SKETCH13_R)
    extrude(amount=CUT_EXTRUDE6_OTHER_WAY_DEPTH, taper=CUT_EXTRUDE6_OTHER_WAY_TAPER, mode=Mode.SUBTRACT)

    # CirPattern2: Cut-Revolve2, Cut-Extrude6 ×2 about axis
    cirpattern2_axis = Axis((0, 21.367211937, 0), (0, -1, 0))
    add([cut_revolve2.rotate(cirpattern2_axis, i * 360 / CIRPATTERN2_COUNT) for i in range(1, CIRPATTERN2_COUNT)], mode=Mode.SUBTRACT)
    add([cut_extrude6.rotate(cirpattern2_axis, i * 360 / CIRPATTERN2_COUNT) for i in range(1, CIRPATTERN2_COUNT)], mode=Mode.SUBTRACT)


with BuildPart() as cirpattern2_copy_1_tool:
    # CirPattern2 copy 1 sketch → CirPattern2 copy 1 (with draft: the straight prism first)
    with BuildSketch(Plane(origin=(0, 0, -79.375), x_dir=(-1, 0, 0), z_dir=(0, 0, -1))):
        Circle(CIRPATTERN2_COPY_1_SKETCH_R)
    extrude(amount=-CIRPATTERN2_COPY_1_DEPTH)
    # CirPattern2 copy 1: the draft: its side faces are tilted about the plane it starts from
    cirpattern2_copy_1_sides = [cirpattern2_copy_1_tool.faces().sort_by_distance(p)[0] for p in [
        (10.668, 0, -73.514128629),
    ]]
    draft(cirpattern2_copy_1_sides, Plane(origin=(0, 0, -79.375), x_dir=(-1, 0, 0), z_dir=(0, 0, -1)), CIRPATTERN2_COPY_1_DRAFT)


with BuildPart() as part_6:
    add(part_5.part)

    # CirPattern2 copy 1: cut by cirpattern2_copy_1_tool
    add(cirpattern2_copy_1_tool.part, mode=Mode.SUBTRACT)

    # Sketch12 → Cut-Extrude5 (cut, through all)
    with BuildSketch(Plane(origin=(0, 19.05, 0), x_dir=(1, 0, 0), z_dir=(0, 1, 0))):
        with Locations(Location((-14.224, 38.1, 0), (0, 0, 270))):
            Circle(SKETCH12_R)
        with Locations(Location((14.224, -38.1, 0), (0, 0, 270))):
            Circle(SKETCH12_R)
    cut_extrude5 = extrude(amount=-CUT_EXTRUDE5_DEPTH, mode=Mode.SUBTRACT)

    # CirPattern3: Cut-Extrude5 ×2 about axis
    cirpattern3_axis = Axis((0, 0, 87.593551009), (0, 0, 1))
    for i in range(1, CIRPATTERN3_COUNT):
        add(cut_extrude5.rotate(cirpattern3_axis, i * CIRPATTERN3_ANGLE / (CIRPATTERN3_COUNT - 1)), mode=Mode.SUBTRACT)


solid = part_6.part
